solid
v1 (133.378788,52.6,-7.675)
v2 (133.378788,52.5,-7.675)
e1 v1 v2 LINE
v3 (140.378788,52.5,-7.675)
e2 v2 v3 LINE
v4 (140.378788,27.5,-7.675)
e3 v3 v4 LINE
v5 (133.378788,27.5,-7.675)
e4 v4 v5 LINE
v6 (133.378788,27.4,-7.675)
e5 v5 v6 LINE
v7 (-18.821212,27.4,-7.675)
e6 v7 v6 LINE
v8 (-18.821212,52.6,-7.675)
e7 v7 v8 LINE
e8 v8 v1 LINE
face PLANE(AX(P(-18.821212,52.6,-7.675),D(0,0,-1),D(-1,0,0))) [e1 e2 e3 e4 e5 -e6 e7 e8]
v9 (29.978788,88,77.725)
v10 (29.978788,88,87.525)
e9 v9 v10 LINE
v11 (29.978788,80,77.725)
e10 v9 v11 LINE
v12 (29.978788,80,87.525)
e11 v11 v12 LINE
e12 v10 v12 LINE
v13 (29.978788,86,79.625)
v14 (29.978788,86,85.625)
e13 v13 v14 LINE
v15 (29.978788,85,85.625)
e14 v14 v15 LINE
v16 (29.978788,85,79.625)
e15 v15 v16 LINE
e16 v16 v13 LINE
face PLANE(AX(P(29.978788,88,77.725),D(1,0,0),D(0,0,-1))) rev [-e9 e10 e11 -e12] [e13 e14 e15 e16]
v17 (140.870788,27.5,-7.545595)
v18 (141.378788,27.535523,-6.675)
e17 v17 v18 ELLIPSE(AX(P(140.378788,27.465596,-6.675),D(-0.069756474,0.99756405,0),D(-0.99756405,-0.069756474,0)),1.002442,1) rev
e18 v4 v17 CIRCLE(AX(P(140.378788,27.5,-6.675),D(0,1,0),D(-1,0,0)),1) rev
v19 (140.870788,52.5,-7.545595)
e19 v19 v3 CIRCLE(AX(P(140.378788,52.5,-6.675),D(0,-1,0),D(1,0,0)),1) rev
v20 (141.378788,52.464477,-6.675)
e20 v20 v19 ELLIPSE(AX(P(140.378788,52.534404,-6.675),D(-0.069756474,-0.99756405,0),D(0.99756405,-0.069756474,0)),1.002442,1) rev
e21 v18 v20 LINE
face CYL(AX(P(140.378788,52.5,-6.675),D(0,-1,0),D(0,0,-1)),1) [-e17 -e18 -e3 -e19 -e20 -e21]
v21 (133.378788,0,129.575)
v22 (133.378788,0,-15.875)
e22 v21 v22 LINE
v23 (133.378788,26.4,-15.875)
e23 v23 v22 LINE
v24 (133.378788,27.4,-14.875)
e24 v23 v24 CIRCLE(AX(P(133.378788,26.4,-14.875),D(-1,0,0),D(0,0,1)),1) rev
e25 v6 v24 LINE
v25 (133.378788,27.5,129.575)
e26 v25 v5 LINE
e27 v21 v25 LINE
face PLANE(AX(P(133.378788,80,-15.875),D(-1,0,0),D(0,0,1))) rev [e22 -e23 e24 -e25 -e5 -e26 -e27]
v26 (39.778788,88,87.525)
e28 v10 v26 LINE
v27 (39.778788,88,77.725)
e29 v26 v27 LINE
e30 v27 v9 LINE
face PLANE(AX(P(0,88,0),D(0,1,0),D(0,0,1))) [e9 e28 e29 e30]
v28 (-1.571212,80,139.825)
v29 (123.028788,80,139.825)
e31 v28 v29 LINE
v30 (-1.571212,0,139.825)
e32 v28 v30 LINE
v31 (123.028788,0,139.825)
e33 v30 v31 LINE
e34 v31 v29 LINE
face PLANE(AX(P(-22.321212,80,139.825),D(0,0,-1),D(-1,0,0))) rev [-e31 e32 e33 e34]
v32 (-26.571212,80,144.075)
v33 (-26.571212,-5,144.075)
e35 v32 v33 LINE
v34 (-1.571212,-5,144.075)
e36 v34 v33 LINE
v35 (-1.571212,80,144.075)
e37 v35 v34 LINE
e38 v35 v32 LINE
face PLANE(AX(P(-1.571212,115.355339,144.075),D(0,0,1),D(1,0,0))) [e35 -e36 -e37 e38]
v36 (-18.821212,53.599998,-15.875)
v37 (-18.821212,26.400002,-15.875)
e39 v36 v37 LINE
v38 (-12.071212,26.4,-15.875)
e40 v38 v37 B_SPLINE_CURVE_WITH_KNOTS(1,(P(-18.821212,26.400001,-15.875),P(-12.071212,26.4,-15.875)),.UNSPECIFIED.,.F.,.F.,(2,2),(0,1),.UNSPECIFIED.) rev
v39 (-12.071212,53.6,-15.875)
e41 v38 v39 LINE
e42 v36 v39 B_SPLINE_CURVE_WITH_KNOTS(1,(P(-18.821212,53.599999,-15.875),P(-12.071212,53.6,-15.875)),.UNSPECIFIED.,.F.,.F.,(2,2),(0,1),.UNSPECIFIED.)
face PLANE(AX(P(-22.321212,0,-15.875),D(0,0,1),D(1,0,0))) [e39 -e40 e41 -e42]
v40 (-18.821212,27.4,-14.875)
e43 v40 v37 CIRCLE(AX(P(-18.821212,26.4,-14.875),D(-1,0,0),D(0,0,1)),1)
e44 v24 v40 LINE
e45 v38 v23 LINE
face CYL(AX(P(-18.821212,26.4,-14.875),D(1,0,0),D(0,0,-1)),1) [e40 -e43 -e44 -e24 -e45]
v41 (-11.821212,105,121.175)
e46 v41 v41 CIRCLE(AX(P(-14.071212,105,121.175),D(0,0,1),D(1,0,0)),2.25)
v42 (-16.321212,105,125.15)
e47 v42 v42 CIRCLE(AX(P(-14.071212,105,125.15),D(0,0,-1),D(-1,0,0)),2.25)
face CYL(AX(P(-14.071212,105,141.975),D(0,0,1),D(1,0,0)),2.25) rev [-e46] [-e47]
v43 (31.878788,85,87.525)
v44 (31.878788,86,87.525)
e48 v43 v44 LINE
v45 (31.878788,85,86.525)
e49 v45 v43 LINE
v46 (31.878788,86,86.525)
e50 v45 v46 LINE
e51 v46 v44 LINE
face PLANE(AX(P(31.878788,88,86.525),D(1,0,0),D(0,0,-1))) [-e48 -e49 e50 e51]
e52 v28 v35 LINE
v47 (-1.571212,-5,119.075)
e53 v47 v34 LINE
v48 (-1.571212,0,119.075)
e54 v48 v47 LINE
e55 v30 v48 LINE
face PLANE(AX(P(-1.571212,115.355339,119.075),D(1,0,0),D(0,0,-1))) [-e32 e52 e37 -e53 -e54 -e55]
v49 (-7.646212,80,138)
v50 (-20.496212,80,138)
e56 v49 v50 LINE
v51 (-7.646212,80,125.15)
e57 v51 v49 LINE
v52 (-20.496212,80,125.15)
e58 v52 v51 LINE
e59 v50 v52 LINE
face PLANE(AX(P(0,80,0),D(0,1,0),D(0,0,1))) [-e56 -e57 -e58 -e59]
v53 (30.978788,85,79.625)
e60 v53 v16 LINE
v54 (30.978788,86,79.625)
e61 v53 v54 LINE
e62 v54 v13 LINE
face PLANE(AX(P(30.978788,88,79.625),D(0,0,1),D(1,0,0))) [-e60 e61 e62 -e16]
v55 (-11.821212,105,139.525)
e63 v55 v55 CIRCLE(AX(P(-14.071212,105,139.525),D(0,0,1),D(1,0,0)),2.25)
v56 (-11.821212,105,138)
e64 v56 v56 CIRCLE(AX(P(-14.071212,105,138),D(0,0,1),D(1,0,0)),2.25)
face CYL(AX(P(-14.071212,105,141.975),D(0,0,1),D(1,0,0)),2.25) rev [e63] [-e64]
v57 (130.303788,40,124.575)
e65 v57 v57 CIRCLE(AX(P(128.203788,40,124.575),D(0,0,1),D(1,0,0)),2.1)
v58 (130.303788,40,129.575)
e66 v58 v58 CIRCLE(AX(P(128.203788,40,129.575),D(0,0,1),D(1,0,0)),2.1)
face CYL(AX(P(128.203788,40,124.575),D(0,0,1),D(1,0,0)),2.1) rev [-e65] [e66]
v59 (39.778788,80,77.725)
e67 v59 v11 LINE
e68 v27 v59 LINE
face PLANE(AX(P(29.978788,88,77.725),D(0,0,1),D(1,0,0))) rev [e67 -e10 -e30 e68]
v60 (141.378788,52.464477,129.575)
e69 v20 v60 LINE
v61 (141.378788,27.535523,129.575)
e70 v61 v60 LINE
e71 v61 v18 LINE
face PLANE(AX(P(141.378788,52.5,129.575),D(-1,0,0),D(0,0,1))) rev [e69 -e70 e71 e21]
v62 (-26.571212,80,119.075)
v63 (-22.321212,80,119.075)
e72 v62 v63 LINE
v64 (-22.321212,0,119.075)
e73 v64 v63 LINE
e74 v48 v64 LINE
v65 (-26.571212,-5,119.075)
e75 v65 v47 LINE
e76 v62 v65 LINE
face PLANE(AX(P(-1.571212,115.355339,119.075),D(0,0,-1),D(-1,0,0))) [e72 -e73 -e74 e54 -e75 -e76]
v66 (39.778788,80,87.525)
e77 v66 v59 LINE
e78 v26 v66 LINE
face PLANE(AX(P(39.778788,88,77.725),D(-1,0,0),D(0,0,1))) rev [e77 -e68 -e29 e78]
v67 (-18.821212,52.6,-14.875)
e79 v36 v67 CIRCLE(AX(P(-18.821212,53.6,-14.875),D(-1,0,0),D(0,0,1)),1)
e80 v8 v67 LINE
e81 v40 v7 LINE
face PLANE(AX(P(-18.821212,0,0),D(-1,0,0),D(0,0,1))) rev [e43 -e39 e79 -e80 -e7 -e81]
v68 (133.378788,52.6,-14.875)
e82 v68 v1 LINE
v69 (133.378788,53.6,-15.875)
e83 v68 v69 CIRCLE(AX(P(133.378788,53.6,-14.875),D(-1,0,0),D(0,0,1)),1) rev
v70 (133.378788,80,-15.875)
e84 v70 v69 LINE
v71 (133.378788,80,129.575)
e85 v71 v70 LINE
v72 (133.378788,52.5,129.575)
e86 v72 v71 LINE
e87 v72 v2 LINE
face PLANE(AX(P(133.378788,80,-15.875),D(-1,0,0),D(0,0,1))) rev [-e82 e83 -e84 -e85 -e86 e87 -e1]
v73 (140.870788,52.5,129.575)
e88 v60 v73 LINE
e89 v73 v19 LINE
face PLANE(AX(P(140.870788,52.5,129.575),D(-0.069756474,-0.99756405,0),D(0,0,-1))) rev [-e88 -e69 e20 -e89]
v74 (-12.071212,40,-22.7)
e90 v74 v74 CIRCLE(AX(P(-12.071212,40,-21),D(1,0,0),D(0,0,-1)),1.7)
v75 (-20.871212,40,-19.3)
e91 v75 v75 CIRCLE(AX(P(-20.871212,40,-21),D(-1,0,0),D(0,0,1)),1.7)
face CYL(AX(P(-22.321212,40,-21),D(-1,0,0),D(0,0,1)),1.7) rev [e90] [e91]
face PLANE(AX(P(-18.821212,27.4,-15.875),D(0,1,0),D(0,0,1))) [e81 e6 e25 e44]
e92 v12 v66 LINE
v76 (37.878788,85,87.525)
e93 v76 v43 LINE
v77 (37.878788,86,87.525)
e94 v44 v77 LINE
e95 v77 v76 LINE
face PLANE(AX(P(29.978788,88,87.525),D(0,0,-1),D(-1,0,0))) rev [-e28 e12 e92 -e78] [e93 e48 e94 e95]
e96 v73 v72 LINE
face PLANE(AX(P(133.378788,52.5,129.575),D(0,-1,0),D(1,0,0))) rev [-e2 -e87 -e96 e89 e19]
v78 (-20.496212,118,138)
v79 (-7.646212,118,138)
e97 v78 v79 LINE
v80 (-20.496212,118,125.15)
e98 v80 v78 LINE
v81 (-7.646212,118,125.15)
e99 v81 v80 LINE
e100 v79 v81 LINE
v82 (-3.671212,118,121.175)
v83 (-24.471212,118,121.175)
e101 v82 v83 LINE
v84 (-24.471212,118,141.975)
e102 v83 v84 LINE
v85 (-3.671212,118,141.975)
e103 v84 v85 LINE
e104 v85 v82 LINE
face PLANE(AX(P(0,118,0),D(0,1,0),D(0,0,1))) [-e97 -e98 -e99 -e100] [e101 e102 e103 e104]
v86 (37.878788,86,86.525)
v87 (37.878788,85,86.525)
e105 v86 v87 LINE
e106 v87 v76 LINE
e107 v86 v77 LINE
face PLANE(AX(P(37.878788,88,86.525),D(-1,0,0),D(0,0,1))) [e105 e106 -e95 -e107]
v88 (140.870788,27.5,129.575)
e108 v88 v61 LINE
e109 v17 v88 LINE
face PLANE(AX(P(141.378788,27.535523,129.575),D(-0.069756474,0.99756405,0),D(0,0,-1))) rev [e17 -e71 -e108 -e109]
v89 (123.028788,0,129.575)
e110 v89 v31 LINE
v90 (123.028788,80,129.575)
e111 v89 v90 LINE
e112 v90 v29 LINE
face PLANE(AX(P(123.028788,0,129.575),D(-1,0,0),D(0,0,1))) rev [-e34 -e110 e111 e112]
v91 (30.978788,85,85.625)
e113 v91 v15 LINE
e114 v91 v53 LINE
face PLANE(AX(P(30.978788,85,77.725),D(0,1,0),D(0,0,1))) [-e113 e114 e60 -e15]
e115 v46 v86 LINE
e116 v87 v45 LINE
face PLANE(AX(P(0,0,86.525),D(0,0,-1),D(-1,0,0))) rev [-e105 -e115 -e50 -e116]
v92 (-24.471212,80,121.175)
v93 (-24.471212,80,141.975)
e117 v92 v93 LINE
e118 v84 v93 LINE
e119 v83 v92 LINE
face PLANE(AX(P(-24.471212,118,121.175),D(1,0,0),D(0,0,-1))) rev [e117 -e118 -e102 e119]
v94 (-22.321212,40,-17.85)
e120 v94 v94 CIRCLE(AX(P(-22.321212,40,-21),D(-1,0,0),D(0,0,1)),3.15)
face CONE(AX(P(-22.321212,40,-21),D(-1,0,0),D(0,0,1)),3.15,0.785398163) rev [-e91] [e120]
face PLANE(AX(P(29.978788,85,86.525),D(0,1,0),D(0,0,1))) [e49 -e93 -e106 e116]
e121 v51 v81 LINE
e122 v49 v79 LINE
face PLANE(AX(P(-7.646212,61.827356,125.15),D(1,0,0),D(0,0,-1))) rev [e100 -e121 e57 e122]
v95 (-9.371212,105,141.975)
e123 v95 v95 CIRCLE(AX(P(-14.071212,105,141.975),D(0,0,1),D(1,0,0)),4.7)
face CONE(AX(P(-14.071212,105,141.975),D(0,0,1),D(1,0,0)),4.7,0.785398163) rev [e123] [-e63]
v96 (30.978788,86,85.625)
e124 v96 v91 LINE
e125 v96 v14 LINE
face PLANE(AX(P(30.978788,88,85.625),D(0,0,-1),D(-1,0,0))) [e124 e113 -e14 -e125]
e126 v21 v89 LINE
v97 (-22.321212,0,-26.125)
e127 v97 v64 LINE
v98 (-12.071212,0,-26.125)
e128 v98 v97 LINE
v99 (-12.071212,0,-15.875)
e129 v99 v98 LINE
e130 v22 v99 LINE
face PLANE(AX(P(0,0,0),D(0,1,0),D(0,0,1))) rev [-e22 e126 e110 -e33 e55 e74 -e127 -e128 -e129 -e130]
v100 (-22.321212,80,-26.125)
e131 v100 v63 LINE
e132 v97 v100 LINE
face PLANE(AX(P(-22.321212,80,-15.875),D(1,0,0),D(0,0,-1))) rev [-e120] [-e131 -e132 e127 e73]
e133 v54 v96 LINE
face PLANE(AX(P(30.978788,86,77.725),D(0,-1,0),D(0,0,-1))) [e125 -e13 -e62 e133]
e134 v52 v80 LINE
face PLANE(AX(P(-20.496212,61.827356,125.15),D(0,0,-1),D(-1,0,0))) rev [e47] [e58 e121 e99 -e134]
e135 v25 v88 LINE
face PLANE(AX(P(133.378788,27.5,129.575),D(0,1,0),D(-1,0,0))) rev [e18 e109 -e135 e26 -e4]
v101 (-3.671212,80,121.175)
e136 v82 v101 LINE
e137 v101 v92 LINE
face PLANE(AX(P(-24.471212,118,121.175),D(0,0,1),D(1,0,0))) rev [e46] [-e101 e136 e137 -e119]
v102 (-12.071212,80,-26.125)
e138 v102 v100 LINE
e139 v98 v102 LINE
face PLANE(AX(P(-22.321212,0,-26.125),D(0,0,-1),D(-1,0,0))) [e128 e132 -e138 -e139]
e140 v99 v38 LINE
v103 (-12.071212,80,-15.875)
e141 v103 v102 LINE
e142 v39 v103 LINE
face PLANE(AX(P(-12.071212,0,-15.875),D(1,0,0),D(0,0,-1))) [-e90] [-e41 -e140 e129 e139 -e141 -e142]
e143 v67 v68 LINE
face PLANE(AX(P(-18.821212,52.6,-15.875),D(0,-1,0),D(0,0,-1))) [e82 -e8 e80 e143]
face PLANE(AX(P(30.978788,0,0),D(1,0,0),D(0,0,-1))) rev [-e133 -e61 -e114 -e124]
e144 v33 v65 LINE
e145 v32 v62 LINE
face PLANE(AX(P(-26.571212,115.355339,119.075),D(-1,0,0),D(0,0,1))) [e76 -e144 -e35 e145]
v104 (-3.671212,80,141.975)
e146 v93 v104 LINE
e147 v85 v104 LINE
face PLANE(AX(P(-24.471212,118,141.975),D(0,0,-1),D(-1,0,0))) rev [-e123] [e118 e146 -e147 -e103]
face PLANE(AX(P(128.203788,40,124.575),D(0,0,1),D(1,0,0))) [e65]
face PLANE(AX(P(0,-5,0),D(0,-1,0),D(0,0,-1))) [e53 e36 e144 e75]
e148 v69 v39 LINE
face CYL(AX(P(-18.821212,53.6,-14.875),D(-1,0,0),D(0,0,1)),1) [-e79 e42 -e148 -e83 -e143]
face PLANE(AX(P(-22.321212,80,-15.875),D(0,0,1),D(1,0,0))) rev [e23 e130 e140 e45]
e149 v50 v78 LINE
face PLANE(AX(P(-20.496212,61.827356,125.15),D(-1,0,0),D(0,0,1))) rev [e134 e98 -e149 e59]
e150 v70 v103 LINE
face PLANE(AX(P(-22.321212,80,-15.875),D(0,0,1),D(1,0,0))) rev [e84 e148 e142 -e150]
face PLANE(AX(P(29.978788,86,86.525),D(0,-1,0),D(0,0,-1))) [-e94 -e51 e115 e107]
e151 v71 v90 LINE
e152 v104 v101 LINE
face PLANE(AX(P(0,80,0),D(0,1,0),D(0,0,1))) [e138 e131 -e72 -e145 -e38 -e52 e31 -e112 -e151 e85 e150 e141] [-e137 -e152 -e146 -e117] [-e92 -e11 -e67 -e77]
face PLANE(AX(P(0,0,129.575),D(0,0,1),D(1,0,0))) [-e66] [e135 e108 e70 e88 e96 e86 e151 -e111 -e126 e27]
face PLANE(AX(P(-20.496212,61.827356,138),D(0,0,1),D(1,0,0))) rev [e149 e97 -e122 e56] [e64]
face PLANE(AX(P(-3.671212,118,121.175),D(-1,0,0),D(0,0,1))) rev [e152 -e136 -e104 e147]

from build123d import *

# Parameters (mm, degrees)
SKETCH1_W                                           = 155.7
SKETCH1_H                                           = 155.7
BOSS_EXTRUDE2_DEPTH                                 = 80
SKETCH3_W                                           = 8
SKETCH3_H                                           = 25
BOSS_EXTRUDE4_DEPTH                                 = 145.45
CHAMFER1_SIZE                                       = 0.508
CHAMFER1_SIZE2                                      = 0.03552282
CHAMFER2_SIZE                                       = 0.508
CHAMFER2_SIZE2                                      = 0.03552282
SKETCH4_W                                           = 8.2
SKETCH4_H                                           = 25.2
CUT_EXTRUDE6_DEPTH                                  = 160.2
FILLET1_R                                           = 1
SKETCH6_W                                           = 10.35
SKETCH6_H                                           = 10.25
CUT_EXTRUDE7_DEPTH                                  = 80
SKETCH7_W                                           = 10.25
SKETCH7_H                                           = 10.25
BOSS_EXTRUDE5_DEPTH                                 = 80
CSK_FOR_M3_COUNTERSUNK_FLAT_HEAD_SCREW1_D           = 3.4
CSK_FOR_M3_COUNTERSUNK_FLAT_HEAD_SCREW1_DEPTH       = 16
CSK_FOR_M3_COUNTERSUNK_FLAT_HEAD_SCREW1_CSINK_D     = 6.3
CSK_FOR_M3_COUNTERSUNK_FLAT_HEAD_SCREW1_CSINK_ANGLE = 90
CSK_FOR_M3_COUNTERSUNK_FLAT_HEAD_SCREW1_TIP         = 1.021463052
SKETCH12_R                                          = 2.1
CUT_EXTRUDE9_DEPTH                                  = 5
FILLET2_START                                       = -18.821212121
FILLET2_DEPTH                                       = 152.821212121
FILLET3_START                                       = -18.821212121
FILLET3_DEPTH                                       = 152.821212121
SKETCH14_W                                          = 9.8
SKETCH14_H                                          = 9.8
BOSS_EXTRUDE6_DEPTH                                 = 8
CUT_EXTRUDE12_START                                 = -9.8
SKETCH17_W                                          = 6
SKETCH17_H                                          = 1
CUT_EXTRUDE12_DEPTH                                 = 1
CUT_EXTRUDE13_START                                 = -9.8
SKETCH19_W                                          = 6
SKETCH19_H                                          = 1
CUT_EXTRUDE13_DEPTH                                 = 1
BOSS_EXTRUDE7_DEPTH                                 = 5
BOSS_EXTRUDE7_DEPTH_BACK                            = 80
SKETCH20_W                                          = 25
SKETCH20_H                                          = 25
SKETCH21_W                                          = 20.8
SKETCH21_H                                          = 20.8
BOSS_EXTRUDE8_DEPTH                                 = 38
SKETCH23_W                                          = 12.85
SKETCH23_H                                          = 12.85
CUT_EXTRUDE14_DEPTH                                 = 38
CSK_FOR_M4_COUNTERSUNK_FLAT_HEAD_SCREW1_D           = 4.5
CSK_FOR_M4_COUNTERSUNK_FLAT_HEAD_SCREW1_DEPTH       = 26
CSK_FOR_M4_COUNTERSUNK_FLAT_HEAD_SCREW1_CSINK_D     = 9.4
CSK_FOR_M4_COUNTERSUNK_FLAT_HEAD_SCREW1_CSINK_ANGLE = 90
CSK_FOR_M4_COUNTERSUNK_FLAT_HEAD_SCREW1_TIP         = 1.351936393


with BuildPart() as part:
    # Sketch1 → Boss-Extrude2 (new body)
    with BuildSketch(Plane(origin=(0, 0, 0), x_dir=(1, 0, 0), z_dir=(0, 1, 0))):
        with Locations((55.528787879, -61.975)):
            Rectangle(SKETCH1_W, SKETCH1_H)
    extrude(amount=BOSS_EXTRUDE2_DEPTH)

    # Sketch3 → Boss-Extrude4 (add)
    with BuildSketch(Plane.XY.offset(-15.875)):
        with Locations((137.378787879, 40)):
            Rectangle(SKETCH3_W, SKETCH3_H)
    extrude(amount=BOSS_EXTRUDE4_DEPTH)

    # Chamfer1
    chamfer1_edges = [part.edges().sort_by_distance(p)[0] for p in [
        (141.378787879, 52.5, 56.85),
    ]]
    chamfer1_side = [part.faces().sort_by_distance(p)[0] for p in [
        (137.378787879, 52.5, 56.85),
    ]]
    chamfer(chamfer1_edges, length=CHAMFER1_SIZE, length2=CHAMFER1_SIZE2, reference=chamfer1_side[0])

    # Chamfer2
    chamfer2_edges = [part.edges().sort_by_distance(p)[0] for p in [
        (141.378787879, 27.5, 56.85),
    ]]
    chamfer2_side = [part.faces().sort_by_distance(p)[0] for p in [
        (137.378787879, 27.5, 56.85),
    ]]
    chamfer(chamfer2_edges, length=CHAMFER2_SIZE, length2=CHAMFER2_SIZE2, reference=chamfer2_side[0])

    # Sketch4 → Cut-Extrude6 (cut)
    with BuildSketch(Plane.ZY.offset(-141.378787879)):
        with Locations((-11.775, 40)):
            Rectangle(SKETCH4_W, SKETCH4_H)
    extrude(amount=CUT_EXTRUDE6_DEPTH, mode=Mode.SUBTRACT)

    # Fillet1
    fillet1_edges = [part.edges().sort_by_distance(p)[0] for p in [
        (141.378787879, 40, -7.675),
    ]]
    fillet(fillet1_edges, radius=FILLET1_R)

    # Sketch6 → Cut-Extrude7 (cut)
    with BuildSketch(Plane(origin=(0, 80, 0), x_dir=(1, 0, 0), z_dir=(0, 1, 0))):
        with Locations((128.203787879, -134.7)):
            Rectangle(SKETCH6_W, SKETCH6_H)
    extrude(amount=-CUT_EXTRUDE7_DEPTH, mode=Mode.SUBTRACT)

    # Sketch7 → Boss-Extrude5 (add)
    with BuildSketch(Plane(origin=(0, 80, 0), x_dir=(1, 0, 0), z_dir=(0, 1, 0))):
        with Locations((-17.196212121, 21)):
            Rectangle(SKETCH7_W, SKETCH7_H)
    extrude(amount=-BOSS_EXTRUDE5_DEPTH)

    # CSK for M3 Countersunk Flat Head Screw1
    with Locations(Plane.ZY.offset(22.321212121)):
        with Locations((-21, 40)):
            CounterSinkHole(CSK_FOR_M3_COUNTERSUNK_FLAT_HEAD_SCREW1_D / 2, CSK_FOR_M3_COUNTERSUNK_FLAT_HEAD_SCREW1_CSINK_D / 2, depth=CSK_FOR_M3_COUNTERSUNK_FLAT_HEAD_SCREW1_DEPTH, counter_sink_angle=CSK_FOR_M3_COUNTERSUNK_FLAT_HEAD_SCREW1_CSINK_ANGLE)
            with Locations((0, 0, -(CSK_FOR_M3_COUNTERSUNK_FLAT_HEAD_SCREW1_DEPTH + CSK_FOR_M3_COUNTERSUNK_FLAT_HEAD_SCREW1_TIP / 2))):  # 118° drill point
                Cone(0, CSK_FOR_M3_COUNTERSUNK_FLAT_HEAD_SCREW1_D / 2, CSK_FOR_M3_COUNTERSUNK_FLAT_HEAD_SCREW1_TIP, mode=Mode.SUBTRACT)

    # Sketch12 → Cut-Extrude9 (cut)
    with BuildSketch(Plane.XY.offset(129.575)):
        with Locations((128.203787879, 40)):
            Circle(SKETCH12_R)
    extrude(amount=-CUT_EXTRUDE9_DEPTH, mode=Mode.SUBTRACT)

    # Fillet2: read off the stored shape, not the designer's step
    # Fillet2 outline → Fillet2 (cut)
    with BuildSketch(Plane.YZ.offset(FILLET2_START)):
        with BuildLine():
            Line((52.6, -15.875), (53.6, -15.875))
            ThreePointArc((53.6, -15.875), (52.892893219, -15.582106781), (52.6, -14.875))
            Line((52.6, -14.875), (52.6, -15.875))
        make_face()
    extrude(amount=FILLET2_DEPTH, mode=Mode.SUBTRACT)

    # Fillet3: read off the stored shape, not the designer's step
    # Fillet3 outline → Fillet3 (cut)
    with BuildSketch(Plane.YZ.offset(FILLET3_START)):
        with BuildLine():
            ThreePointArc((27.4, -14.875), (27.107106781, -15.582106781), (26.4, -15.875))
            Line((26.4, -15.875), (27.4, -15.875))
            Line((27.4, -15.875), (27.4, -14.875))
        make_face()
    extrude(amount=FILLET3_DEPTH, mode=Mode.SUBTRACT)

    # Sketch14 → Boss-Extrude6 (add)
    with BuildSketch(Plane(origin=(0, 80, 0), x_dir=(1, 0, 0), z_dir=(0, 1, 0))):
        with Locations((34.878787879, -82.625)):
            Rectangle(SKETCH14_W, SKETCH14_H)
    extrude(amount=BOSS_EXTRUDE6_DEPTH)

    # Sketch17 → Cut-Extrude12 (cut)
    with BuildSketch(Plane(origin=(39.778787879, 0, 0), x_dir=(0, 0, -1), z_dir=(1, 0, 0)).offset(CUT_EXTRUDE12_START)):
        with Locations((-82.625, 85.5)):
            Rectangle(SKETCH17_W, SKETCH17_H)
    extrude(amount=CUT_EXTRUDE12_DEPTH, mode=Mode.SUBTRACT)

    # Sketch19 → Cut-Extrude13 (cut)
    with BuildSketch(Plane(origin=(0, 0, 77.725), x_dir=(-1, 0, 0), z_dir=(0, 0, -1)).offset(CUT_EXTRUDE13_START)):
        with Locations((-34.878787879, 85.5)):
            Rectangle(SKETCH19_W, SKETCH19_H)
    extrude(amount=CUT_EXTRUDE13_DEPTH, mode=Mode.SUBTRACT)

    # Sketch20 → Boss-Extrude7 (add, two sides: drawn at the far end of the back side and taken through both)
    with BuildSketch(Plane(origin=(0, 0, 0), x_dir=(-1, 0, 0), z_dir=(0, -1, 0)).offset(-BOSS_EXTRUDE7_DEPTH_BACK)):
        with Locations((14.071212121, -131.575)):
            Rectangle(SKETCH20_W, SKETCH20_H)
    extrude(amount=BOSS_EXTRUDE7_DEPTH + BOSS_EXTRUDE7_DEPTH_BACK)

    # Sketch21 → Boss-Extrude8 (add)
    with BuildSketch(Plane(origin=(0, 80, 0), x_dir=(1, 0, 0), z_dir=(0, 1, 0))):
        with Locations((-14.071212121, -131.575)):
            Rectangle(SKETCH21_W, SKETCH21_H)
    extrude(amount=BOSS_EXTRUDE8_DEPTH)

    # Sketch23 → Cut-Extrude14 (cut)
    with BuildSketch(Plane(origin=(0, 118, 0), x_dir=(1, 0, 0), z_dir=(0, 1, 0))):
        with Locations((-14.071212121, -131.575)):
            Rectangle(SKETCH23_W, SKETCH23_H)
    extrude(amount=-CUT_EXTRUDE14_DEPTH, mode=Mode.SUBTRACT)

    # CSK for M4 Countersunk Flat Head Screw1
    with Locations(Plane.XY.offset(141.975)):
        with Locations((-14.071212121, 105)):
            CounterSinkHole(CSK_FOR_M4_COUNTERSUNK_FLAT_HEAD_SCREW1_D / 2, CSK_FOR_M4_COUNTERSUNK_FLAT_HEAD_SCREW1_CSINK_D / 2, depth=CSK_FOR_M4_COUNTERSUNK_FLAT_HEAD_SCREW1_DEPTH, counter_sink_angle=CSK_FOR_M4_COUNTERSUNK_FLAT_HEAD_SCREW1_CSINK_ANGLE)
            with Locations((0, 0, -(CSK_FOR_M4_COUNTERSUNK_FLAT_HEAD_SCREW1_DEPTH + CSK_FOR_M4_COUNTERSUNK_FLAT_HEAD_SCREW1_TIP / 2))):  # 118° drill point
                Cone(0, CSK_FOR_M4_COUNTERSUNK_FLAT_HEAD_SCREW1_D / 2, CSK_FOR_M4_COUNTERSUNK_FLAT_HEAD_SCREW1_TIP, mode=Mode.SUBTRACT)


solid = part.part
